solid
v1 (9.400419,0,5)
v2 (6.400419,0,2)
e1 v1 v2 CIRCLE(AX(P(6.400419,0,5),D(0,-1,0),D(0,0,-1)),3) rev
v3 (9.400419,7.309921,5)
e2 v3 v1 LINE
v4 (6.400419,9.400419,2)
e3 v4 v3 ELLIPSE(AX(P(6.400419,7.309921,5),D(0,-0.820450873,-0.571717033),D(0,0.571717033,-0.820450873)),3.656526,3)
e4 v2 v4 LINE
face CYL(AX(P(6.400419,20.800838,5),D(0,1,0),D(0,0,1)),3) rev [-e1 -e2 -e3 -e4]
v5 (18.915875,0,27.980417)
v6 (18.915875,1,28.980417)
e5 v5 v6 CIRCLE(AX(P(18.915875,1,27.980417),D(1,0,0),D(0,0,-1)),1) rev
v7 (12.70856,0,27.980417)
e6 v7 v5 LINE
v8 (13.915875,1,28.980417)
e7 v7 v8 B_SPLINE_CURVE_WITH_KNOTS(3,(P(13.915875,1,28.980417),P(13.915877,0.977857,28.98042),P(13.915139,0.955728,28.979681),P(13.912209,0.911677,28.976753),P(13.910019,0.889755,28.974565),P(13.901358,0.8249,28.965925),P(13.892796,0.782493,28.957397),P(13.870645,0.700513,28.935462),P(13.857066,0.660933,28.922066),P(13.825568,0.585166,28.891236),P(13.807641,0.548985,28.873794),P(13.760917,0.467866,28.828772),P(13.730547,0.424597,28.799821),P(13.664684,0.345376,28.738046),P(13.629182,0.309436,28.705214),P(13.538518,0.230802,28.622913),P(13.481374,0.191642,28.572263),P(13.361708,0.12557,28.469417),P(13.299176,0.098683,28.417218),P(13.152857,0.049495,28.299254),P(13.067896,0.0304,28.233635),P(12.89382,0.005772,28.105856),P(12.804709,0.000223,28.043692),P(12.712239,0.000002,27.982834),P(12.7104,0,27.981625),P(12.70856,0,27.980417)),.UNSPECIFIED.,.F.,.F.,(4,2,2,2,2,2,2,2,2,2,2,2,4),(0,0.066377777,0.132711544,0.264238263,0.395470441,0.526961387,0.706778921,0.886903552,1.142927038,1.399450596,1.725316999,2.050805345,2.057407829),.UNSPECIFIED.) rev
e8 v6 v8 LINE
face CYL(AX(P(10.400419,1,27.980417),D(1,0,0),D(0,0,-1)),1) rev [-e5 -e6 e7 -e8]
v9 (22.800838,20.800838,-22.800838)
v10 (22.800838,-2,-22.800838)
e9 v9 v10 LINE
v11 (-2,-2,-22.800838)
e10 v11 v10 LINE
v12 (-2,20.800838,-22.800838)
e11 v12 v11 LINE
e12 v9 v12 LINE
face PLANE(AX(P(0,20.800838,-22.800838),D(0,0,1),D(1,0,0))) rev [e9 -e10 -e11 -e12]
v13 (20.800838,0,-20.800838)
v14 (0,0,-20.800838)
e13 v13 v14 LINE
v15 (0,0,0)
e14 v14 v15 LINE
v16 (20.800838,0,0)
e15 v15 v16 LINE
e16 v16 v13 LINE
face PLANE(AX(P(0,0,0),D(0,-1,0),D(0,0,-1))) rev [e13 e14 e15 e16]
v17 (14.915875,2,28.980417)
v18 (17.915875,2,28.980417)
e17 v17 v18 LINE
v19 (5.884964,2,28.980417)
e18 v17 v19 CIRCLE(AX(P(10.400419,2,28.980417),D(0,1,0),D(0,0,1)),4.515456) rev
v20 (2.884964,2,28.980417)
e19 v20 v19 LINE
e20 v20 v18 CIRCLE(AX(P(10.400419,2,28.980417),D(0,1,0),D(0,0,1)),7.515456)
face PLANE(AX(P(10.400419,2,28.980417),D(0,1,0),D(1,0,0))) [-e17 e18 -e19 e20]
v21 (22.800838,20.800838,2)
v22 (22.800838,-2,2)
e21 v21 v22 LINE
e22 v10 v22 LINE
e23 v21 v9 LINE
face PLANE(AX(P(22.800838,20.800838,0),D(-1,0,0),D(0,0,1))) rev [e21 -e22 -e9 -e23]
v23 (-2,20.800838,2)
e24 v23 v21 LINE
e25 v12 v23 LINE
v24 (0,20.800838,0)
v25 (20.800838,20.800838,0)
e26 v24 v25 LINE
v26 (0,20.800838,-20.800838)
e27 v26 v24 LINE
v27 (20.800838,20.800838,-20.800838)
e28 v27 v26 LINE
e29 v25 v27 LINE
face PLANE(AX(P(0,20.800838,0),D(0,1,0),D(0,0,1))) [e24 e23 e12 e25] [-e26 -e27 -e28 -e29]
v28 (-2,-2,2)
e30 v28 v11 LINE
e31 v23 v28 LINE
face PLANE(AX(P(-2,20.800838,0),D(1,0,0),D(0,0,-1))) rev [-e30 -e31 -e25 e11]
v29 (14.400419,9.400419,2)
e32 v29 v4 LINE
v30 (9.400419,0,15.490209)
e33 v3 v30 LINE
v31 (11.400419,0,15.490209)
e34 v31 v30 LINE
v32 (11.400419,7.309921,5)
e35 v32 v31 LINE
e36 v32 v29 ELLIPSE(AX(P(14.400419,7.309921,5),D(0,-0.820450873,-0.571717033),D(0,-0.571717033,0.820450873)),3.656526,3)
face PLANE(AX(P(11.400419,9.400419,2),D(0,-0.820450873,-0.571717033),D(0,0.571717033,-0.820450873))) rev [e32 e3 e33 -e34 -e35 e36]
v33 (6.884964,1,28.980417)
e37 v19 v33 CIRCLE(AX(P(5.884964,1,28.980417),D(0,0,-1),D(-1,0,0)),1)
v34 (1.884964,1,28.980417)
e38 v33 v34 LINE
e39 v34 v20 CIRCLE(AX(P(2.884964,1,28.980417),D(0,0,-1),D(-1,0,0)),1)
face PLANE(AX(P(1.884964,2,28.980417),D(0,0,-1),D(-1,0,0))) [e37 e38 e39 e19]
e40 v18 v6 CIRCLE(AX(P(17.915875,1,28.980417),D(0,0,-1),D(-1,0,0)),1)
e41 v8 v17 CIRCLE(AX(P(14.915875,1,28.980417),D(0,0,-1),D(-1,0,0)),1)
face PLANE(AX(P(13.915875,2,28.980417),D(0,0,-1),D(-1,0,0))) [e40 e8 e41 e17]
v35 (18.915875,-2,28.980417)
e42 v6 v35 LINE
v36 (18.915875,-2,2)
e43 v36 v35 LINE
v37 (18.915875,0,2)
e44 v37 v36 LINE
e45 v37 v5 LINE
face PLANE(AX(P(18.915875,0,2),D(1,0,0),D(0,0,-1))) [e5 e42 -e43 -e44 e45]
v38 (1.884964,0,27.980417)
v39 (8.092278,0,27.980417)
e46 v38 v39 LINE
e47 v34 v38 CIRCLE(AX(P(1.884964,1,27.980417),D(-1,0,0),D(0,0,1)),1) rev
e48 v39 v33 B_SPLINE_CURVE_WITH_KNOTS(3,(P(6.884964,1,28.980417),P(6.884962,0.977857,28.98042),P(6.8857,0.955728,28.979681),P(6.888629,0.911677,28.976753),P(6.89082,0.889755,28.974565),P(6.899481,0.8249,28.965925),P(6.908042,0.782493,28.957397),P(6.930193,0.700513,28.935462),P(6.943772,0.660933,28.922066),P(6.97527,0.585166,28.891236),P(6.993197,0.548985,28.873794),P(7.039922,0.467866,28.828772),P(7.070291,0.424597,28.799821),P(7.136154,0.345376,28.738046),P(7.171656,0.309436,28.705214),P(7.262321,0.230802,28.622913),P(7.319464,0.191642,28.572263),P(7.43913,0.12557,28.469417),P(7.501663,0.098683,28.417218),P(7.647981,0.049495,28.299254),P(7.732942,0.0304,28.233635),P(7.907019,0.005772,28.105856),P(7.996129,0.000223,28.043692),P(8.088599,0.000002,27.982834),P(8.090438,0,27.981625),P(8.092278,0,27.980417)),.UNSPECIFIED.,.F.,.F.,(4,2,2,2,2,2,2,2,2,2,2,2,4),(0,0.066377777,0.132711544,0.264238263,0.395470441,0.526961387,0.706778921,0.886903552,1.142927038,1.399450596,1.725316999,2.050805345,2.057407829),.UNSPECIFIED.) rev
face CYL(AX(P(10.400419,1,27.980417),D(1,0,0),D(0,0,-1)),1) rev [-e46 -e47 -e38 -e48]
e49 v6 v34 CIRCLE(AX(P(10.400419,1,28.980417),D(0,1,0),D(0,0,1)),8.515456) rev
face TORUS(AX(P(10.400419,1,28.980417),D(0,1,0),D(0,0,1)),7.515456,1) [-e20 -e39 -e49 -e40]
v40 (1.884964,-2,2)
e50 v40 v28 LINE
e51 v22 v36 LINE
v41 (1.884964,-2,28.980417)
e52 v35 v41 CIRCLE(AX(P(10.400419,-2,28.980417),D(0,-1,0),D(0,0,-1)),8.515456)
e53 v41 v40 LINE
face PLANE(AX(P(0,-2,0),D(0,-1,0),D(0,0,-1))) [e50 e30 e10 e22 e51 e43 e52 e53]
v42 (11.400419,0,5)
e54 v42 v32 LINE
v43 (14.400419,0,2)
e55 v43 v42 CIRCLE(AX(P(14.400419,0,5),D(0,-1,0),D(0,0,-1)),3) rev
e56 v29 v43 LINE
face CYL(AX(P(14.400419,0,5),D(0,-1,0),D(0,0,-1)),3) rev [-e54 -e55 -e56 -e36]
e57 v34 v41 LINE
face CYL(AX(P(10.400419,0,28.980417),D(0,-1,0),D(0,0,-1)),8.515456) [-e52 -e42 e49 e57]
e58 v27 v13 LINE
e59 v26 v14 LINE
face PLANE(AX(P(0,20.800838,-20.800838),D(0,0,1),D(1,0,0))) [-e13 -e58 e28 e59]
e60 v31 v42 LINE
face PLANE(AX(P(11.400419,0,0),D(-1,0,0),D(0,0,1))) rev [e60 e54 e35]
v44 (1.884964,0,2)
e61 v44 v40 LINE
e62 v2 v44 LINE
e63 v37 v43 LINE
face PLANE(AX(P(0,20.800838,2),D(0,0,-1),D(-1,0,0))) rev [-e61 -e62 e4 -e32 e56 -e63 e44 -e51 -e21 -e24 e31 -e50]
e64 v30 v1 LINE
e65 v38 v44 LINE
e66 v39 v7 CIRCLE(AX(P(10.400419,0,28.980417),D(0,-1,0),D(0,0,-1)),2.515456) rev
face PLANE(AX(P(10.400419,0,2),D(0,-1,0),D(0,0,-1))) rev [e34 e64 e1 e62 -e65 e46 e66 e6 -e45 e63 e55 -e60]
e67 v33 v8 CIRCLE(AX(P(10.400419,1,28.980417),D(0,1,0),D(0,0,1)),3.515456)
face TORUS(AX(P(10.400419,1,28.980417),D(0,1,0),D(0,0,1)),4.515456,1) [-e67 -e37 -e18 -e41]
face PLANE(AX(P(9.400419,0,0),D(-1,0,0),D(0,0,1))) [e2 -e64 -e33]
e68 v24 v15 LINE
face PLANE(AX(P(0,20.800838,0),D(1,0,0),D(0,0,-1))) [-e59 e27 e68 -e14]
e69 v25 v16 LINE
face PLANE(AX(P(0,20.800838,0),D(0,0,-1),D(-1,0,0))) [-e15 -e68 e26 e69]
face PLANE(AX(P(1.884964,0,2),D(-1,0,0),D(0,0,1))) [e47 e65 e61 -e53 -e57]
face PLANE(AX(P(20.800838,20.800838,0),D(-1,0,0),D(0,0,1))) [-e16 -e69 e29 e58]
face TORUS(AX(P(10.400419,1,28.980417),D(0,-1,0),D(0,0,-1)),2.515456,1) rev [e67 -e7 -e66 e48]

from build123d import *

# Parameters (mm, degrees)
SKETCH1_W           = 24.80083823
SKETCH1_H           = 24.80083823
SKETCH1_W_2         = 20.80083823
SKETCH1_H_2         = 20.80083823
EXTRUDE_THIN1_DEPTH = 20.80083823
SKETCH2_W           = 24.80083823
SKETCH2_H           = 24.80083823
BOSS_EXTRUDE1_DEPTH = 2
BOSS_EXTRUDE2_DEPTH = 2
BOSS_EXTRUDE3_DEPTH = 1
FILLET2_R           = 3
EXTRUDE_THIN2_DEPTH = 2
FILLET3_R           = 1


with BuildPart() as part:
    # Sketch1 → Extrude-Thin1 (new body)
    with BuildSketch(Plane(origin=(0, 0, 0), x_dir=(1, 0, 0), z_dir=(0, 1, 0))):
        with Locations((10.400419115, 10.400419115)):
            Rectangle(SKETCH1_W, SKETCH1_H)
        with Locations((10.400419115, 10.400419115)):
            Rectangle(SKETCH1_W_2, SKETCH1_H_2, mode=Mode.SUBTRACT)
    extrude(amount=EXTRUDE_THIN1_DEPTH)

    # Sketch2 → Boss-Extrude1 (add)
    with BuildSketch(Plane.XZ):
        with Locations((10.400419115, -10.400419115)):
            Rectangle(SKETCH2_W, SKETCH2_H)
    extrude(amount=BOSS_EXTRUDE1_DEPTH)

    # Sketch4 → Boss-Extrude2 (add)
    with BuildSketch(Plane.XZ.offset(2)):
        with BuildLine():
            Line((1.884963608, 2), (1.884963608, 28.980417336))
            ThreePointArc((1.884963608, 28.980417336), (10.400419115, 37.495872843), (18.915874622, 28.980417336))
            Line((18.915874622, 28.980417336), (18.915874622, 2))
            ThreePointArc((18.915874622, 2), (10.400419115, -6.515455507), (1.884963608, 2))
        make_face()
    extrude(amount=-BOSS_EXTRUDE2_DEPTH)

    # Sketch5 → Boss-Extrude3 (add, symmetric)
    with BuildSketch(Plane(origin=(10.400419115, 0, 0), x_dir=(0, 0, -1), z_dir=(1, 0, 0))):
        Polygon((-2, 9.400419115), (-15.490208668, 0), (-2, 0), align=None)
    extrude(amount=BOSS_EXTRUDE3_DEPTH, both=True)

    # Fillet2
    fillet2_edges = [part.edges().sort_by_distance(p)[0] for p in [
        (9.400419115, 4.700209558, 2),
        (11.400419115, 4.700209558, 2),
    ]]
    fillet(fillet2_edges, radius=FILLET2_R)

    # Sketch6 → Extrude-Thin2 (add)
    with BuildSketch(Plane(origin=(0, 0, 0), x_dir=(1, 0, 0), z_dir=(0, 1, 0))):
        with BuildLine():
            ThreePointArc((1.884963608, -28.980417336), (10.400419115, -37.495872843), (18.915874622, -28.980417336))
            Line((18.915874622, -28.980417336), (13.915874622, -28.980417336))
            ThreePointArc((13.915874622, -28.980417336), (10.400419115, -32.495872843), (6.884963608, -28.980417336))
            Line((6.884963608, -28.980417336), (1.884963608, -28.980417336))
        make_face()
    extrude(amount=EXTRUDE_THIN2_DEPTH)

    # Fillet3
    fillet3_edges = [part.edges().sort_by_distance(p)[0] for p in [
        (16.415874622, 0, 28.980417336),
        (4.384963608, 0, 28.980417336),
        (10.400419115, 2, 37.495872843),
        (10.400419115, 2, 32.495872843),
        (10.400419115, 0, 32.495872843),
    ]]
    fillet(fillet3_edges, radius=FILLET3_R - 0.0001)  # a hair under: the kernel refuses the full size


solid = part.part
